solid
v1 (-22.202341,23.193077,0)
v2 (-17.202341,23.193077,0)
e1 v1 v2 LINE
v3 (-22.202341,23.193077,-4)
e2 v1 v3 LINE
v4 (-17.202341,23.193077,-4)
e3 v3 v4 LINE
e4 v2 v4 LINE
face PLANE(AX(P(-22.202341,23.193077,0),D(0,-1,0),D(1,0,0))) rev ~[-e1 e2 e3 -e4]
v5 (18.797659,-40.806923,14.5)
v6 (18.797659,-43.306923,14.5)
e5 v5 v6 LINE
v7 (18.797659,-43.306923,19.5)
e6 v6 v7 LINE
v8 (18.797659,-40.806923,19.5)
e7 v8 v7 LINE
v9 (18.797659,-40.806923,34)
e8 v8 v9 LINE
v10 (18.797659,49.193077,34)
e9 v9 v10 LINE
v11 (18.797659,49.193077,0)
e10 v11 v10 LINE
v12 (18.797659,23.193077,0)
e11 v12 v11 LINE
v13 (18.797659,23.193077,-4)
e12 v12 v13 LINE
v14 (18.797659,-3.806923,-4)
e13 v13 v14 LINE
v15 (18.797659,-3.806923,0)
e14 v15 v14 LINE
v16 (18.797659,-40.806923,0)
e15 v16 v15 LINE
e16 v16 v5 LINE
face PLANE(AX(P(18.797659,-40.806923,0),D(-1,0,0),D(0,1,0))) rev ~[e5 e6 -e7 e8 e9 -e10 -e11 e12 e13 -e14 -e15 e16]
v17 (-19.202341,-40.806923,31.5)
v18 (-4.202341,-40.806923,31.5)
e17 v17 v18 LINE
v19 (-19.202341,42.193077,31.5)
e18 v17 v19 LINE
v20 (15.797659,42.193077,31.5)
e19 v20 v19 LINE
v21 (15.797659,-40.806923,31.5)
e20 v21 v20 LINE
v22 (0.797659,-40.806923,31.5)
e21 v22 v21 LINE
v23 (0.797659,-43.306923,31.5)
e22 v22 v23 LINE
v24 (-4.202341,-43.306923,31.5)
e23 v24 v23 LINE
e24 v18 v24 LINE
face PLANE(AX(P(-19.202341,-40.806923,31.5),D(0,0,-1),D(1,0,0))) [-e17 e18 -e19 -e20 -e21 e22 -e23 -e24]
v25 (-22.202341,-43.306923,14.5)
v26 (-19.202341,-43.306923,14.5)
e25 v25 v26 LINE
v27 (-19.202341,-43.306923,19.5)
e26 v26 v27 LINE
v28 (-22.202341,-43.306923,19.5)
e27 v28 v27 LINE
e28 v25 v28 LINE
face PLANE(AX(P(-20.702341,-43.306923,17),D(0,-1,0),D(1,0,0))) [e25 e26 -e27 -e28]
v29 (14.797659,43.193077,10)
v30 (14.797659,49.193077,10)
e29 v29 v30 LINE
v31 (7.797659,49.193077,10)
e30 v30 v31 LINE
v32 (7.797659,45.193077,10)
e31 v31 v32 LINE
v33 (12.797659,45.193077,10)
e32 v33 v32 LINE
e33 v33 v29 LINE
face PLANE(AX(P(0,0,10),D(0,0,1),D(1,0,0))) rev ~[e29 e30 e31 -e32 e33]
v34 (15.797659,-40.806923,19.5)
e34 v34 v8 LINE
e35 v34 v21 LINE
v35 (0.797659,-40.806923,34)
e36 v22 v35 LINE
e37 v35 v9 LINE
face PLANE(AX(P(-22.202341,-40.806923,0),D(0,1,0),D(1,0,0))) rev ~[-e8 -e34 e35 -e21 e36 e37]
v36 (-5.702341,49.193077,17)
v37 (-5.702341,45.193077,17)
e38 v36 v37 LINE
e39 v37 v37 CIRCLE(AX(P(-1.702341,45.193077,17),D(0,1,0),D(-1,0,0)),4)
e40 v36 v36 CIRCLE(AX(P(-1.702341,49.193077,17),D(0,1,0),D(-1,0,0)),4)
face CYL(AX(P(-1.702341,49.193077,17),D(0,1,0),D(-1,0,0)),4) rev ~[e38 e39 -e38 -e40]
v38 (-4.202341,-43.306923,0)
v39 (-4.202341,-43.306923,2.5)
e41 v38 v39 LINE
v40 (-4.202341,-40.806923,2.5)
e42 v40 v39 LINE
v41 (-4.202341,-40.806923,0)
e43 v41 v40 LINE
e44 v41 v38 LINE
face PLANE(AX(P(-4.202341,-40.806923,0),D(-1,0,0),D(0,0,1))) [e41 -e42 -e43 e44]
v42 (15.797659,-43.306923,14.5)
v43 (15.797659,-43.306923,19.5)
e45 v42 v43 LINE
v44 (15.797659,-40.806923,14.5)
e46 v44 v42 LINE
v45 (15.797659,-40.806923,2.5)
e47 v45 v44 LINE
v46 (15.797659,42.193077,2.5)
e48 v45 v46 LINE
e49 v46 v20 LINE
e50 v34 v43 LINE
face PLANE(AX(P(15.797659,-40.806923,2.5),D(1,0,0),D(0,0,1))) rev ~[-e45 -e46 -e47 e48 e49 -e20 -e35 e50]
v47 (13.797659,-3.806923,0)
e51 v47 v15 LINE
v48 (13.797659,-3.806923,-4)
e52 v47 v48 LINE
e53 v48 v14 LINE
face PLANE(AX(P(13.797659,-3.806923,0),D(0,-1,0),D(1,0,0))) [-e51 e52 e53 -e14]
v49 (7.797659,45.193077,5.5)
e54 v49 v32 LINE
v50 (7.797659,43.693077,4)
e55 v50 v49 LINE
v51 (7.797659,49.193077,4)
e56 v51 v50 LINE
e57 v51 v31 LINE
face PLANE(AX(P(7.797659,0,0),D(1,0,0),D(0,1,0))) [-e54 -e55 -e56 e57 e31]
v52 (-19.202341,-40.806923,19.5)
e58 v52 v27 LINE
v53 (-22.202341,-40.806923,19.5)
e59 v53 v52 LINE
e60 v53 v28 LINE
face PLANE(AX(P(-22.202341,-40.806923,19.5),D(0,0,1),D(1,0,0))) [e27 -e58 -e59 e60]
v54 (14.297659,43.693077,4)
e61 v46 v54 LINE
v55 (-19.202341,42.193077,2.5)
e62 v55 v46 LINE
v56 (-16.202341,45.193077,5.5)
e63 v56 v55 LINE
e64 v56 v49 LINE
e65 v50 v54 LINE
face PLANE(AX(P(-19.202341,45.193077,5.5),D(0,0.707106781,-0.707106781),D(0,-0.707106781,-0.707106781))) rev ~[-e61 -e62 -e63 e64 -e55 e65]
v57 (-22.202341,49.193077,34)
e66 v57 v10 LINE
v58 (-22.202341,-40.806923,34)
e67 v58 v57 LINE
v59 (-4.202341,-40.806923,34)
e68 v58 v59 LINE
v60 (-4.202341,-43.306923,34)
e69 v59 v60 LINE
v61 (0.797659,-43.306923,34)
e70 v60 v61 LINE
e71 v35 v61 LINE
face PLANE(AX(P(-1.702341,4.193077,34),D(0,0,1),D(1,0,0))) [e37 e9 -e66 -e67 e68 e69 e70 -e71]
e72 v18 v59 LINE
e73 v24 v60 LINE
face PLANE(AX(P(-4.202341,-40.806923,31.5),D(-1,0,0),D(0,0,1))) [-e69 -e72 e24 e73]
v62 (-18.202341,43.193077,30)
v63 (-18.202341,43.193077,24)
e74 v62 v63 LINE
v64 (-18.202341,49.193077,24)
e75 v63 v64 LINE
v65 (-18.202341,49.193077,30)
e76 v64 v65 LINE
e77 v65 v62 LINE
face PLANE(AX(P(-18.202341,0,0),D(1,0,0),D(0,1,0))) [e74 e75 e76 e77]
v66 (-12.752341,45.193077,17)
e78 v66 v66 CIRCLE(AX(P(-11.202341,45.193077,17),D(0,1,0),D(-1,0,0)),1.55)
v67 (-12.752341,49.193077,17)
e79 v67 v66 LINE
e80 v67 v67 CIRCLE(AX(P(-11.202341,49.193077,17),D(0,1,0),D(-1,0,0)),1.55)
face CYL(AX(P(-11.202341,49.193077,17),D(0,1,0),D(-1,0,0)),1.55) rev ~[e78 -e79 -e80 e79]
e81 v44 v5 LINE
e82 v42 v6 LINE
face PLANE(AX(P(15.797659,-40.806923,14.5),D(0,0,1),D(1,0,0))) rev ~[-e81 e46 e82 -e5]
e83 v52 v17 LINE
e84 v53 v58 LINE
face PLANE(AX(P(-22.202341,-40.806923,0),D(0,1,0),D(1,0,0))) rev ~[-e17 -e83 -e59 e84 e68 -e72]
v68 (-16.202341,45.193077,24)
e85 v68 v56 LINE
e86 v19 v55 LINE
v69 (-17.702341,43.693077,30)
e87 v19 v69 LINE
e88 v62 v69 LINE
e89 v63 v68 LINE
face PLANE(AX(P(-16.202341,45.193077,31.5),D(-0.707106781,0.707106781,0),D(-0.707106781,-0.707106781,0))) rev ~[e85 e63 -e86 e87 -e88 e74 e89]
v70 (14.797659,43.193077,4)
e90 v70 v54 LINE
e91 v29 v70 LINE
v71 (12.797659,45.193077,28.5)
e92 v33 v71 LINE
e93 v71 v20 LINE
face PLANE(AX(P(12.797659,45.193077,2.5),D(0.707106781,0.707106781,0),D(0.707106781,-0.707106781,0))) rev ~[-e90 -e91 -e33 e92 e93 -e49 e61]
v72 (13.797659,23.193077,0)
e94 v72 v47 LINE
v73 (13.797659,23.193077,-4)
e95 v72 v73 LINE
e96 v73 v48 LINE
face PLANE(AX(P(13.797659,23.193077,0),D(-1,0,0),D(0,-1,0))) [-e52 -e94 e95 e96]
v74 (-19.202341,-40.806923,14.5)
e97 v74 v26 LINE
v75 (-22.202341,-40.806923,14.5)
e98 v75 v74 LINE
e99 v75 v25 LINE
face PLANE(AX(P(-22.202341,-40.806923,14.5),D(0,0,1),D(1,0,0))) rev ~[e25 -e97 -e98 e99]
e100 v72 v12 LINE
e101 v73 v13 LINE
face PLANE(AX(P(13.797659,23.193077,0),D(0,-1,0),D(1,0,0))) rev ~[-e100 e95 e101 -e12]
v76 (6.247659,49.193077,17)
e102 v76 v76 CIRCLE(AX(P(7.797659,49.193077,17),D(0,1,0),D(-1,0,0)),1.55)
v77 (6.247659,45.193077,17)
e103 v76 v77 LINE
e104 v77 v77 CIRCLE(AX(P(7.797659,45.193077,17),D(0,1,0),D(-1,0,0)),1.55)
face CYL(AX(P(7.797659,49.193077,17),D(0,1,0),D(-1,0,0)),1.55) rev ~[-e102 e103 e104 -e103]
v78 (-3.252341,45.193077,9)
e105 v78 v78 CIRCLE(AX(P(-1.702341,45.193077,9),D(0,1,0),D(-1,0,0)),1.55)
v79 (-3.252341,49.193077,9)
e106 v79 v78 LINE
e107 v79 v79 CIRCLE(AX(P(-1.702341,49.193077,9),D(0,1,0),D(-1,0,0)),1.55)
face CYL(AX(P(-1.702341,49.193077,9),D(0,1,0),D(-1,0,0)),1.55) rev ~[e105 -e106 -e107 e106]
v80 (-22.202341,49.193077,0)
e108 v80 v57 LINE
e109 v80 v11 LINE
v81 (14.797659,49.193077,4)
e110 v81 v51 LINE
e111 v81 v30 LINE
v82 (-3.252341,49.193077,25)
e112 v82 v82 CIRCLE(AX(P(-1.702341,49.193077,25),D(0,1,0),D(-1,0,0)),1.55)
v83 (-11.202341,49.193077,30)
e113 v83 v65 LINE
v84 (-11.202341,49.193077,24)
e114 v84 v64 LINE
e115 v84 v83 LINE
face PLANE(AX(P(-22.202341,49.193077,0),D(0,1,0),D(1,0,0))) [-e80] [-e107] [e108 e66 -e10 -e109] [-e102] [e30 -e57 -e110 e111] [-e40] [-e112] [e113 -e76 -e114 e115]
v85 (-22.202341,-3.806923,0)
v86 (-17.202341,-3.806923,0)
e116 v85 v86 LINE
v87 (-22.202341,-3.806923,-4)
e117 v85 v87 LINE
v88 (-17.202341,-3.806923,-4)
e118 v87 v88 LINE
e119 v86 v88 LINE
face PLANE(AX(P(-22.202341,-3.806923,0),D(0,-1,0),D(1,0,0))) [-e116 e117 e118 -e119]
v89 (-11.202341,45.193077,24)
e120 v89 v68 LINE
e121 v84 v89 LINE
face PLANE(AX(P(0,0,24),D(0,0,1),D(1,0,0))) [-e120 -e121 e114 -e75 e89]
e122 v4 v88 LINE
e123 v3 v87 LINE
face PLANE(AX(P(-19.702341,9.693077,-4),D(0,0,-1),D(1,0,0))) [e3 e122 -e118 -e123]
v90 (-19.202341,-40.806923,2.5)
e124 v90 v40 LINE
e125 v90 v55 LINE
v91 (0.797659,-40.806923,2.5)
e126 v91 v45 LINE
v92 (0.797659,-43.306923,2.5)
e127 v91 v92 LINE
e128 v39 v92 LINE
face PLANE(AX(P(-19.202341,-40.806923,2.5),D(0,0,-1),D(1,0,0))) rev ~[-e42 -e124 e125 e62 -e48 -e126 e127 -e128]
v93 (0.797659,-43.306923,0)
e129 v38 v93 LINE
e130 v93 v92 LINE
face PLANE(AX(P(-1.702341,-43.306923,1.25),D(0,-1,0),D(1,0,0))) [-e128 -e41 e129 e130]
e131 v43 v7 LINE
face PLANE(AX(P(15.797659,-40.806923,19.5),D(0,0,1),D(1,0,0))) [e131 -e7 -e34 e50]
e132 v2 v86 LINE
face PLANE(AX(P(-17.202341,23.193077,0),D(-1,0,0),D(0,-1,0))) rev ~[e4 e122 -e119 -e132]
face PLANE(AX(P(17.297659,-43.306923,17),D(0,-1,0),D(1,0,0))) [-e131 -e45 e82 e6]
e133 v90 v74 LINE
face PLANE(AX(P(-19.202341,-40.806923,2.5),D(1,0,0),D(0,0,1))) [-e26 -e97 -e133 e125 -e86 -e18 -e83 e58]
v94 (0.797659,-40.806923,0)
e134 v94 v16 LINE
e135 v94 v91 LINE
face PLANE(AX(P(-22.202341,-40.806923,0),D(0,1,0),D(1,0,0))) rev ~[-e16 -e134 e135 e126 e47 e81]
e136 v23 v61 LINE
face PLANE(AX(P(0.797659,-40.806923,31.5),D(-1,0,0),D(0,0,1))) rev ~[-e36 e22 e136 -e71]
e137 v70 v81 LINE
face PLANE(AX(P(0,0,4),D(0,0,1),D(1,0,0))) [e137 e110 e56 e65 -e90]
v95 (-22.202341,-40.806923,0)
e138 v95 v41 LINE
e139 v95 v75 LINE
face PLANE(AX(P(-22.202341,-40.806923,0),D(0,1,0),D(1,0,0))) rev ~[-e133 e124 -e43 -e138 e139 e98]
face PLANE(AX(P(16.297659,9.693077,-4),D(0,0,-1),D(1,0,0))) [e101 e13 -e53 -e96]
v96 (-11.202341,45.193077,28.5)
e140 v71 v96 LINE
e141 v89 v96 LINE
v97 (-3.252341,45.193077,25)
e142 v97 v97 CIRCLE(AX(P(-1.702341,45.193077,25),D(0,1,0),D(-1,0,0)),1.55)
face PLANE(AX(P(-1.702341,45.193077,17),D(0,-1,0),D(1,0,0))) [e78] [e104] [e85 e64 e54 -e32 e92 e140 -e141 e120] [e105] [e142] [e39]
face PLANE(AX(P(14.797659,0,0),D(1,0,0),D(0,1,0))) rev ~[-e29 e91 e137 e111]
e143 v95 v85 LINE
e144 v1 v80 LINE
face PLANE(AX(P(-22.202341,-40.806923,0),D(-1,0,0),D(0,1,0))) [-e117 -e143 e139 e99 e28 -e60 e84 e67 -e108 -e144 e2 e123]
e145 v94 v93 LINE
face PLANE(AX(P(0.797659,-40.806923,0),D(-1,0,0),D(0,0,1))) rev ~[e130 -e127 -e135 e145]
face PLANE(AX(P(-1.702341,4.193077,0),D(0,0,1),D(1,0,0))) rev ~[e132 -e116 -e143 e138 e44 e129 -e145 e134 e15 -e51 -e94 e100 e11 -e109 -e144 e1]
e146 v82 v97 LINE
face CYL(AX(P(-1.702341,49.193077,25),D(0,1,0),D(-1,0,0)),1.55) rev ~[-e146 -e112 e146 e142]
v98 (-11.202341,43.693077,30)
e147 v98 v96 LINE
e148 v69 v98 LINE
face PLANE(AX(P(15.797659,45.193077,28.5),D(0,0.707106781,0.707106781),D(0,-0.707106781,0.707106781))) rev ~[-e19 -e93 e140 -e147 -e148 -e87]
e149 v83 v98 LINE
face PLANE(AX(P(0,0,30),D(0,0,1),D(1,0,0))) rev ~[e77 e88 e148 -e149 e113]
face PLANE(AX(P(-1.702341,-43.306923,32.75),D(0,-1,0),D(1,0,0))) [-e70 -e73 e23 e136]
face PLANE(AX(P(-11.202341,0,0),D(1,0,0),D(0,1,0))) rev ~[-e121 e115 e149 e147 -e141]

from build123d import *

# Parameters (mm, degrees)
F0_W           = 41
F0_H           = 90
F1_DEPTH       = 34
F2_W           = 35
F2_H           = 29
F3_DEPTH       = 86
F4_W           = 7
F4_H           = 6
F4_R           = 1.55
F4_R_2         = 4
F5_DEPTH       = 4
F6_W           = 5
F6_H           = 2.5
F6_W_2         = 3
F6_H_2         = 5
F7_DEPTH       = 2.5
F8_W           = 5
F8_H           = 27
F9_DEPTH       = 4
F10_T4_DEPTH   = 29
F10_T10_DEPTH  = 29
F10_T16_DEPTH  = 29
F10_T23_DEPTH  = 29
F10_T29_DEPTH  = 29
F10_T35_DEPTH  = 29
F10_T41_DEPTH  = 29
F10_T47_DEPTH  = 29
F10_T54_DEPTH  = 29
F10_T60_DEPTH  = 29
F10_T66_DEPTH  = 35
F10_T72_DEPTH  = 35
F10_T78_DEPTH  = 35
F10_T85_DEPTH  = 35
F10_T91_DEPTH  = 35
F10_T97_DEPTH  = 35
F10_T103_DEPTH = 35
F10_T109_DEPTH = 35
F10_T116_DEPTH = 35
F10_T122_DEPTH = 35


# Not quite as in the source:
# - a fillet or chamfer that OpenCascade refuses, or shapes differently, is made with other operations: its cross-section is extruded or revolved along the edge and cut away or added


with BuildPart() as f1:
    # F0 (on Top) → F1 (new body)
    with BuildSketch(Plane.XY):
        with Locations((-1.7023412511, 4.193077401)):
            Rectangle(F0_W, F0_H)
    extrude(amount=F1_DEPTH)

    # F2 (on face) → F3 (cut)
    with BuildSketch(Plane.XZ.offset(40.806922599)):
        with Locations((-1.7023412511, 17)):
            Rectangle(F2_W, F2_H)
    extrude(amount=-F3_DEPTH, mode=Mode.SUBTRACT)

    # F4 (on face) → F5 (cut, through all)
    with BuildSketch(Plane(origin=(0, 49.193077401, 0), x_dir=(-1, 0, 0), z_dir=(0, 1, 0))):
        with Locations((-11.2976587489, 7)):
            Rectangle(F4_W, F4_H)
        with Locations((-7.7976587489, 17)):
            Circle(F4_R)
        with Locations((1.7023412511, 25)):
            Circle(F4_R)
        with Locations((1.7023412511, 17)):
            Circle(F4_R_2)
        with Locations((1.7023412511, 9)):
            Circle(F4_R)
        with Locations((11.2023412511, 17)):
            Circle(F4_R)
        with Locations((14.7023412511, 27)):
            Rectangle(F4_W, F4_H)
    extrude(amount=-F5_DEPTH, mode=Mode.SUBTRACT)

    # F6 (on face) → F7 (join)
    with BuildSketch(Plane.XZ.offset(40.806922599)):
        with Locations((-1.7023412511, 32.75)):
            Rectangle(F6_W, F6_H)
        with Locations((-20.7023412511, 17)):
            Rectangle(F6_W_2, F6_H_2)
        with Locations((17.2976587489, 17)):
            Rectangle(F6_W_2, F6_H_2)
        with Locations((-1.7023412511, 1.25)):
            Rectangle(F6_W, F6_H)
    extrude(amount=F7_DEPTH)

    # F8 (on face) → F9 (join)
    with BuildSketch(Plane(origin=(0, 0, 0), x_dir=(1, 0, 0), z_dir=(0, 0, -1))):
        with Locations((-19.7023412511, -9.693077401)):
            Rectangle(F8_W, F8_H)
        with Locations((16.2976587489, -9.693077401)):
            Rectangle(F8_W, F8_H)
    extrude(amount=F9_DEPTH)

    # F10: chamfer of 3 on 4 edges, made by hand


with BuildPart() as f10_tool2:
    # F10_s3 → F10_t4 (new body)
    with BuildSketch(Plane.XY.offset(31.5)):
        Polygon((-16.2023412511, 45.193077401), (-19.2023412511, 42.193077401), (-19.2023412511, 45.193077401), align=None)
    extrude(amount=-F10_T4_DEPTH)

    split(bisect_by=Plane.YZ.offset(-18.2023412511), keep=Keep.TOP)

    split(bisect_by=Plane.XY.offset(30), keep=Keep.TOP)


with BuildPart() as f1_1:
    add(f1.part)

    # F10_t1: union F10_tool2
    add(f10_tool2.part)


with BuildPart() as f10_tool8:
    # F10_s9 → F10_t10 (new body)
    with BuildSketch(Plane.XY.offset(31.5)):
        Polygon((-16.2023412511, 45.193077401), (-19.2023412511, 42.193077401), (-19.2023412511, 45.193077401), align=None)
    extrude(amount=-F10_T10_DEPTH)

    split(bisect_by=Plane.YZ.offset(-18.2023412511), keep=Keep.BOTTOM)

    split(bisect_by=Plane.XY.offset(30), keep=Keep.TOP)


with BuildPart() as f1_2:
    add(f1_1.part)

    # F10_t7: union F10_tool8
    add(f10_tool8.part)


with BuildPart() as f10_tool14:
    # F10_s15 → F10_t16 (new body)
    with BuildSketch(Plane.XY.offset(31.5)):
        Polygon((-16.2023412511, 45.193077401), (-19.2023412511, 42.193077401), (-19.2023412511, 45.193077401), align=None)
    extrude(amount=-F10_T16_DEPTH)

    split(bisect_by=Plane.YZ.offset(-18.2023412511), keep=Keep.BOTTOM)

    split(bisect_by=Plane.XY.offset(24), keep=Keep.TOP)

    split(bisect_by=Plane.XY.offset(30), keep=Keep.BOTTOM)


with BuildPart() as f1_3:
    add(f1_2.part)

    # F10_t13: union F10_tool14
    add(f10_tool14.part)


with BuildPart() as f10_tool21:
    # F10_s22 → F10_t23 (new body)
    with BuildSketch(Plane.XY.offset(31.5)):
        Polygon((-16.2023412511, 45.193077401), (-19.2023412511, 42.193077401), (-19.2023412511, 45.193077401), align=None)
    extrude(amount=-F10_T23_DEPTH)

    split(bisect_by=Plane.YZ.offset(-18.2023412511), keep=Keep.TOP)

    split(bisect_by=Plane.XY.offset(24), keep=Keep.BOTTOM)


with BuildPart() as f1_4:
    add(f1_3.part)

    # F10_t20: union F10_tool21
    add(f10_tool21.part)


with BuildPart() as f10_tool27:
    # F10_s28 → F10_t29 (new body)
    with BuildSketch(Plane.XY.offset(31.5)):
        Polygon((-16.2023412511, 45.193077401), (-19.2023412511, 42.193077401), (-19.2023412511, 45.193077401), align=None)
    extrude(amount=-F10_T29_DEPTH)

    split(bisect_by=Plane.YZ.offset(-18.2023412511), keep=Keep.BOTTOM)

    split(bisect_by=Plane.XY.offset(24), keep=Keep.BOTTOM)


with BuildPart() as f1_5:
    add(f1_4.part)

    # F10_t26: union F10_tool27
    add(f10_tool27.part)


with BuildPart() as f10_tool33:
    # F10_s34 → F10_t35 (new body)
    with BuildSketch(Plane.XY.offset(2.5)):
        Polygon((12.7976587489, 45.193077401), (15.7976587489, 42.193077401), (15.7976587489, 45.193077401), align=None)
    extrude(amount=F10_T35_DEPTH)

    split(bisect_by=Plane.XY.offset(4), keep=Keep.BOTTOM)

    split(bisect_by=Plane.YZ.offset(14.7976587489), keep=Keep.BOTTOM)


with BuildPart() as f1_6:
    add(f1_5.part)

    # F10_t32: union F10_tool33
    add(f10_tool33.part)


with BuildPart() as f10_tool39:
    # F10_s40 → F10_t41 (new body)
    with BuildSketch(Plane.XY.offset(2.5)):
        Polygon((12.7976587489, 45.193077401), (15.7976587489, 42.193077401), (15.7976587489, 45.193077401), align=None)
    extrude(amount=F10_T41_DEPTH)

    split(bisect_by=Plane.XY.offset(4), keep=Keep.BOTTOM)

    split(bisect_by=Plane.YZ.offset(14.7976587489), keep=Keep.TOP)


with BuildPart() as f1_7:
    add(f1_6.part)

    # F10_t38: union F10_tool39
    add(f10_tool39.part)


with BuildPart() as f10_tool45:
    # F10_s46 → F10_t47 (new body)
    with BuildSketch(Plane.XY.offset(2.5)):
        Polygon((12.7976587489, 45.193077401), (15.7976587489, 42.193077401), (15.7976587489, 45.193077401), align=None)
    extrude(amount=F10_T47_DEPTH)

    split(bisect_by=Plane.XY.offset(4), keep=Keep.TOP)

    split(bisect_by=Plane.YZ.offset(14.7976587489), keep=Keep.TOP)

    split(bisect_by=Plane.XY.offset(10), keep=Keep.BOTTOM)


with BuildPart() as f1_8:
    add(f1_7.part)

    # F10_t44: union F10_tool45
    add(f10_tool45.part)


with BuildPart() as f10_tool52:
    # F10_s53 → F10_t54 (new body)
    with BuildSketch(Plane.XY.offset(2.5)):
        Polygon((12.7976587489, 45.193077401), (15.7976587489, 42.193077401), (15.7976587489, 45.193077401), align=None)
    extrude(amount=F10_T54_DEPTH)

    split(bisect_by=Plane.YZ.offset(14.7976587489), keep=Keep.BOTTOM)

    split(bisect_by=Plane.XY.offset(10), keep=Keep.TOP)


with BuildPart() as f1_9:
    add(f1_8.part)

    # F10_t51: union F10_tool52
    add(f10_tool52.part)


with BuildPart() as f10_tool58:
    # F10_s59 → F10_t60 (new body)
    with BuildSketch(Plane.XY.offset(2.5)):
        Polygon((12.7976587489, 45.193077401), (15.7976587489, 42.193077401), (15.7976587489, 45.193077401), align=None)
    extrude(amount=F10_T60_DEPTH)

    split(bisect_by=Plane.YZ.offset(14.7976587489), keep=Keep.TOP)

    split(bisect_by=Plane.XY.offset(10), keep=Keep.TOP)


with BuildPart() as f1_10:
    add(f1_9.part)

    # F10_t57: union F10_tool58
    add(f10_tool58.part)


with BuildPart() as f10_tool64:
    # F10_s65 → F10_t66 (new body)
    with BuildSketch(Plane.YZ.offset(15.7976587489)):
        Polygon((45.193077401, 28.5), (42.193077401, 31.5), (45.193077401, 31.5), align=None)
    extrude(amount=-F10_T66_DEPTH)

    split(bisect_by=Plane.YZ.offset(-11.2023412511), keep=Keep.TOP)

    split(bisect_by=Plane.XY.offset(30), keep=Keep.BOTTOM)


with BuildPart() as f1_11:
    add(f1_10.part)

    # F10_t63: union F10_tool64
    add(f10_tool64.part)


with BuildPart() as f10_tool70:
    # F10_s71 → F10_t72 (new body)
    with BuildSketch(Plane.YZ.offset(15.7976587489)):
        Polygon((45.193077401, 28.5), (42.193077401, 31.5), (45.193077401, 31.5), align=None)
    extrude(amount=-F10_T72_DEPTH)

    split(bisect_by=Plane.YZ.offset(-11.2023412511), keep=Keep.TOP)

    split(bisect_by=Plane.XY.offset(30), keep=Keep.TOP)


with BuildPart() as f1_12:
    add(f1_11.part)

    # F10_t69: union F10_tool70
    add(f10_tool70.part)


with BuildPart() as f10_tool76:
    # F10_s77 → F10_t78 (new body)
    with BuildSketch(Plane.YZ.offset(15.7976587489)):
        Polygon((45.193077401, 28.5), (42.193077401, 31.5), (45.193077401, 31.5), align=None)
    extrude(amount=-F10_T78_DEPTH)

    split(bisect_by=Plane.YZ.offset(-18.2023412511), keep=Keep.TOP)

    split(bisect_by=Plane.YZ.offset(-11.2023412511), keep=Keep.BOTTOM)

    split(bisect_by=Plane.XY.offset(30), keep=Keep.TOP)


with BuildPart() as f1_13:
    add(f1_12.part)

    # F10_t75: union F10_tool76
    add(f10_tool76.part)


with BuildPart() as f10_tool83:
    # F10_s84 → F10_t85 (new body)
    with BuildSketch(Plane.YZ.offset(15.7976587489)):
        Polygon((45.193077401, 28.5), (42.193077401, 31.5), (45.193077401, 31.5), align=None)
    extrude(amount=-F10_T85_DEPTH)

    split(bisect_by=Plane.YZ.offset(-18.2023412511), keep=Keep.BOTTOM)

    split(bisect_by=Plane.XY.offset(30), keep=Keep.BOTTOM)


with BuildPart() as f1_14:
    add(f1_13.part)

    # F10_t82: union F10_tool83
    add(f10_tool83.part)


with BuildPart() as f10_tool89:
    # F10_s90 → F10_t91 (new body)
    with BuildSketch(Plane.YZ.offset(15.7976587489)):
        Polygon((45.193077401, 28.5), (42.193077401, 31.5), (45.193077401, 31.5), align=None)
    extrude(amount=-F10_T91_DEPTH)

    split(bisect_by=Plane.YZ.offset(-18.2023412511), keep=Keep.BOTTOM)

    split(bisect_by=Plane.XY.offset(30), keep=Keep.TOP)


with BuildPart() as f1_15:
    add(f1_14.part)

    # F10_t88: union F10_tool89
    add(f10_tool89.part)


with BuildPart() as f10_tool95:
    # F10_s96 → F10_t97 (new body)
    with BuildSketch(Plane.YZ.offset(-19.2023412511)):
        Polygon((45.193077401, 5.5), (42.193077401, 2.5), (45.193077401, 2.5), align=None)
    extrude(amount=F10_T97_DEPTH)

    split(bisect_by=Plane.YZ.offset(7.7976587489), keep=Keep.BOTTOM)

    split(bisect_by=Plane.XY.offset(4), keep=Keep.TOP)


with BuildPart() as f1_16:
    add(f1_15.part)

    # F10_t94: union F10_tool95
    add(f10_tool95.part)


with BuildPart() as f10_tool101:
    # F10_s102 → F10_t103 (new body)
    with BuildSketch(Plane.YZ.offset(-19.2023412511)):
        Polygon((45.193077401, 5.5), (42.193077401, 2.5), (45.193077401, 2.5), align=None)
    extrude(amount=F10_T103_DEPTH)

    split(bisect_by=Plane.YZ.offset(7.7976587489), keep=Keep.BOTTOM)

    split(bisect_by=Plane.XY.offset(4), keep=Keep.BOTTOM)


with BuildPart() as f1_17:
    add(f1_16.part)

    # F10_t100: union F10_tool101
    add(f10_tool101.part)


with BuildPart() as f10_tool107:
    # F10_s108 → F10_t109 (new body)
    with BuildSketch(Plane.YZ.offset(-19.2023412511)):
        Polygon((45.193077401, 5.5), (42.193077401, 2.5), (45.193077401, 2.5), align=None)
    extrude(amount=F10_T109_DEPTH)

    split(bisect_by=Plane.YZ.offset(7.7976587489), keep=Keep.TOP)

    split(bisect_by=Plane.XY.offset(4), keep=Keep.BOTTOM)

    split(bisect_by=Plane.YZ.offset(14.7976587489), keep=Keep.BOTTOM)


with BuildPart() as f1_18:
    add(f1_17.part)

    # F10_t106: union F10_tool107
    add(f10_tool107.part)


with BuildPart() as f10_tool114:
    # F10_s115 → F10_t116 (new body)
    with BuildSketch(Plane.YZ.offset(-19.2023412511)):
        Polygon((45.193077401, 5.5), (42.193077401, 2.5), (45.193077401, 2.5), align=None)
    extrude(amount=F10_T116_DEPTH)

    split(bisect_by=Plane.XY.offset(4), keep=Keep.TOP)

    split(bisect_by=Plane.YZ.offset(14.7976587489), keep=Keep.TOP)


with BuildPart() as f1_19:
    add(f1_18.part)

    # F10_t113: union F10_tool114
    add(f10_tool114.part)


with BuildPart() as f10_tool120:
    # F10_s121 → F10_t122 (new body)
    with BuildSketch(Plane.YZ.offset(-19.2023412511)):
        Polygon((45.193077401, 5.5), (42.193077401, 2.5), (45.193077401, 2.5), align=None)
    extrude(amount=F10_T122_DEPTH)

    split(bisect_by=Plane.XY.offset(4), keep=Keep.BOTTOM)

    split(bisect_by=Plane.YZ.offset(14.7976587489), keep=Keep.TOP)


with BuildPart() as f1_20:
    add(f1_19.part)

    # F10_t119: union F10_tool120
    add(f10_tool120.part)


solid = f1_20.part
